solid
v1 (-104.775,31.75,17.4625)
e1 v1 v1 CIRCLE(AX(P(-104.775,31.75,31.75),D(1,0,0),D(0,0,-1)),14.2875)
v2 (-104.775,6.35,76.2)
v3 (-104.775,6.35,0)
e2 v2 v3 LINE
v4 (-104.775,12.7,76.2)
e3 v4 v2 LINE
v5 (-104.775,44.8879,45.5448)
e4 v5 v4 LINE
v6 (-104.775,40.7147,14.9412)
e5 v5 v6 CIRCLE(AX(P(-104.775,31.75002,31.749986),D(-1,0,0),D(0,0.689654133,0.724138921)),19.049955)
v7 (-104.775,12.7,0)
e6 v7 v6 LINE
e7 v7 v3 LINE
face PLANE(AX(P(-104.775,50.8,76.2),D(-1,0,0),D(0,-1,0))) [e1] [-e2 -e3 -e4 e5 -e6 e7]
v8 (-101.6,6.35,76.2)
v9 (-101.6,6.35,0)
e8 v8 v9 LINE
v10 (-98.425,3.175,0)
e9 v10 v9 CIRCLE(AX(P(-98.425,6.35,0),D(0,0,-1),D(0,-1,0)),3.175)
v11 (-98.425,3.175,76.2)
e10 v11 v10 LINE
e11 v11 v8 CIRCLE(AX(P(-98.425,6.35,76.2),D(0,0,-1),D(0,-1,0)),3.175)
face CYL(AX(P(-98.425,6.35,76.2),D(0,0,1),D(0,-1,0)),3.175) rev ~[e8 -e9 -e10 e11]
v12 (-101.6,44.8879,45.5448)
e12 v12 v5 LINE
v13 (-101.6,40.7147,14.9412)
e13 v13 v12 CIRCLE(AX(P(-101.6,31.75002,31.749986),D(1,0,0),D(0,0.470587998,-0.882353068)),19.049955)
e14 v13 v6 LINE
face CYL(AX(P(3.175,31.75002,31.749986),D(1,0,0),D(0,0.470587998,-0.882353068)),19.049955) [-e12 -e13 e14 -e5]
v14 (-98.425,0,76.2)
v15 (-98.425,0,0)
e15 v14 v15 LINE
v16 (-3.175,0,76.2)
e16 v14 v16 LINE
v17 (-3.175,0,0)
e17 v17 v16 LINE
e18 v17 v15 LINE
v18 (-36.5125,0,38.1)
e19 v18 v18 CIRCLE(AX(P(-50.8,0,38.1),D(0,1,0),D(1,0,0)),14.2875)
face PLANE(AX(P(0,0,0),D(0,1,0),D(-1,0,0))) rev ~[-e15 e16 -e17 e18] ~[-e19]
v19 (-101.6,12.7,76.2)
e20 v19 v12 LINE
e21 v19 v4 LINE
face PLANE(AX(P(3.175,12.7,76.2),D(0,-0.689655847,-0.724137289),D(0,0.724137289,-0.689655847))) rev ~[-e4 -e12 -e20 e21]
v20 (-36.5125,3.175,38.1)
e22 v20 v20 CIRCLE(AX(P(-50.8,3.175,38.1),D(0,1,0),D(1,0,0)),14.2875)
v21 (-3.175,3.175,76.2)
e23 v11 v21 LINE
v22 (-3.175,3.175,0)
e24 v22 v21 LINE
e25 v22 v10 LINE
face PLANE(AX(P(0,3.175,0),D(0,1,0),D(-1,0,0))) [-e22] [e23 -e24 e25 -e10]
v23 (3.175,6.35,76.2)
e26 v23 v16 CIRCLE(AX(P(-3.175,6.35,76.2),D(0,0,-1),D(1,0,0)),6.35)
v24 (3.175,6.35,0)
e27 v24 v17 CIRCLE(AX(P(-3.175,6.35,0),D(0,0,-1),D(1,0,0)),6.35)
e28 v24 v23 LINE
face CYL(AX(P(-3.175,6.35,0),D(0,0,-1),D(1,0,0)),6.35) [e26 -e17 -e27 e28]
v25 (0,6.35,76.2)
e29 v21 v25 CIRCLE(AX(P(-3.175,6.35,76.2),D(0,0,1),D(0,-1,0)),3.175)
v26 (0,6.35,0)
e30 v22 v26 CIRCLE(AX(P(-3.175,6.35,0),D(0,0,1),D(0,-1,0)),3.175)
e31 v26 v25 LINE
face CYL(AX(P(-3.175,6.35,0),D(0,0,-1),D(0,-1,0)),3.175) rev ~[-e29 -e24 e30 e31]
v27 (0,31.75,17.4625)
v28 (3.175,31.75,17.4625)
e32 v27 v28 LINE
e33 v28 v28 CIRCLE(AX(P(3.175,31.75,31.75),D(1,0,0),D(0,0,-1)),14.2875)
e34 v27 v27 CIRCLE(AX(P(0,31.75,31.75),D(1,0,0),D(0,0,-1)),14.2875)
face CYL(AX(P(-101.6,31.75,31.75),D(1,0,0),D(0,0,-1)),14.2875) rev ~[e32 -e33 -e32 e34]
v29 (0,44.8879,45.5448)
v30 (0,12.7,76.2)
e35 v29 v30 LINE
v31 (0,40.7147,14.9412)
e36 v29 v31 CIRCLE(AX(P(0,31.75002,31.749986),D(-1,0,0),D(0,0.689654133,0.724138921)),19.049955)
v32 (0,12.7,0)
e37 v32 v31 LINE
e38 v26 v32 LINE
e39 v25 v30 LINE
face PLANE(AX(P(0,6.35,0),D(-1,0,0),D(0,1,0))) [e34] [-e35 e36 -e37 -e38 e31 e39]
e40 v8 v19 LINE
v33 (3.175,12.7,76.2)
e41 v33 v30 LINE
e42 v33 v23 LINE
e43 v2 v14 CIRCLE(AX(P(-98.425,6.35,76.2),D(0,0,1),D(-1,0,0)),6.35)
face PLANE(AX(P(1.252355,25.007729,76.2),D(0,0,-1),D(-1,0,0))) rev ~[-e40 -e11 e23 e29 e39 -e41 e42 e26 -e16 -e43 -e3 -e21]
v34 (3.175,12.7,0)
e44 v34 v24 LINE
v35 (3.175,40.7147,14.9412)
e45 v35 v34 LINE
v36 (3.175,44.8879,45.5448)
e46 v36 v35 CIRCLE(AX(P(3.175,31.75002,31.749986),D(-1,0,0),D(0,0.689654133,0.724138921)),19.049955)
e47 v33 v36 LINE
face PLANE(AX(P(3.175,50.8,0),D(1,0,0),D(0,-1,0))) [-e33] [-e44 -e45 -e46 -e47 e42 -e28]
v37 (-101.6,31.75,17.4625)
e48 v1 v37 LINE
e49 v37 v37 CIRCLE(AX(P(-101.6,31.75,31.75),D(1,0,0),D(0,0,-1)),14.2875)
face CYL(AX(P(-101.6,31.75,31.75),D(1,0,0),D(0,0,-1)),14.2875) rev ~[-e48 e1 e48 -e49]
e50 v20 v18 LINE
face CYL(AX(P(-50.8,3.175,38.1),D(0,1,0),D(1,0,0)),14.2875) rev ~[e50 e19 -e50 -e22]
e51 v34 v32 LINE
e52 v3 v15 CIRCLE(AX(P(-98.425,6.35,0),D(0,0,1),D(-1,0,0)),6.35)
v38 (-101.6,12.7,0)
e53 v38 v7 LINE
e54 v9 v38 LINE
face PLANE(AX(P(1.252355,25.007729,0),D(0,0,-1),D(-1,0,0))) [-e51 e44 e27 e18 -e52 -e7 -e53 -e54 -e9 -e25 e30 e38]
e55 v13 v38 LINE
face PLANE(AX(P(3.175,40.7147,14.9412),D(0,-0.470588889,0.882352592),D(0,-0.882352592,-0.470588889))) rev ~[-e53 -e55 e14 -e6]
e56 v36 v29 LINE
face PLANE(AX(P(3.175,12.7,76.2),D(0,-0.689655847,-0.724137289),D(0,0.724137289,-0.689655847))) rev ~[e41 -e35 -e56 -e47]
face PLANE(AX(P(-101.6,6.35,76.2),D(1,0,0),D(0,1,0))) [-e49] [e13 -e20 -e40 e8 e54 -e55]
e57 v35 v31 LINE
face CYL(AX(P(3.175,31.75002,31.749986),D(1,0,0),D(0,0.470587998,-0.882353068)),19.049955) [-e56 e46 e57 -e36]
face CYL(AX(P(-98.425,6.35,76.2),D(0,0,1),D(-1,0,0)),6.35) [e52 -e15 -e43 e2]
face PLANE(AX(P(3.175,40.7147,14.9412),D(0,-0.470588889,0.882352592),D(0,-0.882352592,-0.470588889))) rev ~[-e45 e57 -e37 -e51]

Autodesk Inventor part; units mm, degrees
ref_plane "YZ Plane" through (0, 0, 0) normal (1, 0, 0) x (0, 1, 0)
ref_plane "XZ Plane" through (0, 0, 0) normal (0, 1, 0) x (-1, 0, 0)
ref_plane "XY Plane" through (0, 0, 0) normal (0, 0, 1) x (1, 0, 0)
sketch "Sketch1" plane through (0, 0, 0) normal (0, 1, 0) x (-1, 0, 0)
  line L0 (0, 0) -> (101.6, 0)
  line L1 (101.6, 0) -> (101.6, 76.2)
  line L2 (101.6, 76.2) -> (0, 76.2)
  line L3 (0, 76.2) -> (0, 0)
  dimension "d0" = 101.6
  dimension "d2" = 76.2
extrude "Plate1" add sketch "Sketch1" along normal blind 3.175
sketch "Sketch2" plane through (-101.6, 3.175, 76.2) normal (-1, 0, 0) x (0, -1, 0)
  line L0 (0, -76.2) -> (0, 0)
  line L1 (0, 0) -> (-47.625, 0)
  line L2 (-47.625, 0) -> (-47.625, -76.2)
  line L3 (-47.625, -76.2) -> (0, -76.2)
edge flange "Flange1" height 50.8 angle 90 thickness 3.175 bend radius 3.175 thickness toward (-1, 0, 0) relief tear relief width 3.175 relief depth 1.5875 edges at (-101.6, 3.175, 38.1) wall of the first edge with corners at (-101.6, 3.175, 0) (-101.6, 3.175, 76.2) (-101.6, 50.8, 76.2) (-101.6, 50.8, 0)
bend "Bend1"
corner "Corner1"
sketch "Sketch3" plane through (0, 3.175, 0) normal (1, 0, 0) x (0, 1, 0)
  line L0 (0, 76.2) -> (0, 0)
  line L1 (0, 0) -> (47.625, 0)
  line L2 (47.625, 0) -> (47.625, 76.2)
  line L3 (47.625, 76.2) -> (0, 76.2)
edge flange "Flange2" height 50.8 angle 90 thickness 3.175 bend radius 3.175 thickness toward (1, 0, 0) relief tear relief width 3.175 relief depth 1.5875 edges at (0, 3.175, 38.1) wall of the first edge with corners at (0, 3.175, 76.2) (0, 3.175, 0) (0, 50.8, 0) (0, 50.8, 76.2)
bend "Bend2"
corner "Corner2"
sketch "Sketch4" plane through (-101.6, 50.8, 76.2) normal (1, 0, 0) x (0, 0, -1)
  line L0 (76.2, 0) -> (0, 0) projected
  circle A0 centre (44.45, -19.05) radius 14.2875
  point P0 (76.2, -50.8)
  dimension "d24" = 28.575
  dimension "d25" = 19.05
extrude "Cut1" cut sketch "Sketch4" against normal mid plane 5080
sketch "Sketch5" plane through (3.175, 50.8, 76.2) normal (1, 0, 0) x (0, 0, -1)
  circle A0 centre (44.45, -19.05) radius 14.2875 projected
  line L0 (0, -44.45) -> (76.2, -44.45) projected
  line L1 (76.2, 0) -> (76.2, -44.45) projected
  line L2 (0, 0) -> (76.2, 0) projected
  line L3 (0, -44.45) -> (0, 0) projected
  arc A1 (61.2588, -10.0853) -> (30.6552, -5.9121) centre (44.45, -19.05) ccw
  line L4 (0, -38.1) -> (30.6552, -5.9121)
  line L5 (61.2588, -10.0853) -> (76.2, -38.1)
  point P0 (76.2, -50.8)
  dimension "d28" = 6.35
  dimension "d29" = 6.35
extrude "Cut2" cut sketch "Sketch5" against normal blind 508 contours L3 L2 A1 L4 | L5 A1 L2 L1
sketch "Sketch6" plane through (0, 3.175, 0) normal (0, 1, 0) x (1, 0, 0)
  circle A0 centre (-50.8, -38.1) radius 14.2875
  line L0 (-3.175, -76.2) -> (-3.175, 0) projected
  line L1 (-3.175, -76.2) -> (-98.425, -76.2) projected
  point P0 (0, 0)
  dimension "d32" = 28.575
  dimension "d35" = 38.1
  dimension "d36" = 47.625
extrude "Cut3" cut sketch "Sketch6" against normal blind 3.175
equation "\"d33\" = Thickness"
equation "\"d4\" = BendReliefWidth"
equation "\"d5\" = BendReliefDepth"
equation "\"d6\" = MinimumRemnant"
equation "\"d7\" = BendRadius"
equation "\"d10\" = BendRadius"
equation "\"d11\" = CornerReliefSize"
equation "\"d12\" = GapSize"
equation "\"d13\" = JacobiRadiusSize"
equation "\"d14\" = BendReliefWidth"
equation "\"d15\" = BendReliefDepth"
equation "\"d16\" = MinimumRemnant"
equation "\"d17\" = BendRadius"
equation "\"d20\" = BendRadius"
equation "\"d21\" = CornerReliefSize"
equation "\"d22\" = GapSize"
equation "\"d23\" = JacobiRadiusSize"
equation "\"BendRadius\" = Thickness"
equation "\"BendReliefWidth\" = Thickness"
equation "\"BendReliefDepth\" = 0.5 * Thickness"
equation "\"CornerReliefSize\" = 4 * Thickness"
equation "\"MinimumRemnant\" = 2 * Thickness"
equation "\"TransitionRadius\" = BendRadius"
equation "\"JacobiRadiusSize\" = BendRadius"
equation "\"GapSize\" = Thickness"
equation "\"d3\" = BendRadius"
equation "\"Thickness\" = 3.175"
properties part number "Bearing Mount 4 v1" material "Aluminum 6061"
